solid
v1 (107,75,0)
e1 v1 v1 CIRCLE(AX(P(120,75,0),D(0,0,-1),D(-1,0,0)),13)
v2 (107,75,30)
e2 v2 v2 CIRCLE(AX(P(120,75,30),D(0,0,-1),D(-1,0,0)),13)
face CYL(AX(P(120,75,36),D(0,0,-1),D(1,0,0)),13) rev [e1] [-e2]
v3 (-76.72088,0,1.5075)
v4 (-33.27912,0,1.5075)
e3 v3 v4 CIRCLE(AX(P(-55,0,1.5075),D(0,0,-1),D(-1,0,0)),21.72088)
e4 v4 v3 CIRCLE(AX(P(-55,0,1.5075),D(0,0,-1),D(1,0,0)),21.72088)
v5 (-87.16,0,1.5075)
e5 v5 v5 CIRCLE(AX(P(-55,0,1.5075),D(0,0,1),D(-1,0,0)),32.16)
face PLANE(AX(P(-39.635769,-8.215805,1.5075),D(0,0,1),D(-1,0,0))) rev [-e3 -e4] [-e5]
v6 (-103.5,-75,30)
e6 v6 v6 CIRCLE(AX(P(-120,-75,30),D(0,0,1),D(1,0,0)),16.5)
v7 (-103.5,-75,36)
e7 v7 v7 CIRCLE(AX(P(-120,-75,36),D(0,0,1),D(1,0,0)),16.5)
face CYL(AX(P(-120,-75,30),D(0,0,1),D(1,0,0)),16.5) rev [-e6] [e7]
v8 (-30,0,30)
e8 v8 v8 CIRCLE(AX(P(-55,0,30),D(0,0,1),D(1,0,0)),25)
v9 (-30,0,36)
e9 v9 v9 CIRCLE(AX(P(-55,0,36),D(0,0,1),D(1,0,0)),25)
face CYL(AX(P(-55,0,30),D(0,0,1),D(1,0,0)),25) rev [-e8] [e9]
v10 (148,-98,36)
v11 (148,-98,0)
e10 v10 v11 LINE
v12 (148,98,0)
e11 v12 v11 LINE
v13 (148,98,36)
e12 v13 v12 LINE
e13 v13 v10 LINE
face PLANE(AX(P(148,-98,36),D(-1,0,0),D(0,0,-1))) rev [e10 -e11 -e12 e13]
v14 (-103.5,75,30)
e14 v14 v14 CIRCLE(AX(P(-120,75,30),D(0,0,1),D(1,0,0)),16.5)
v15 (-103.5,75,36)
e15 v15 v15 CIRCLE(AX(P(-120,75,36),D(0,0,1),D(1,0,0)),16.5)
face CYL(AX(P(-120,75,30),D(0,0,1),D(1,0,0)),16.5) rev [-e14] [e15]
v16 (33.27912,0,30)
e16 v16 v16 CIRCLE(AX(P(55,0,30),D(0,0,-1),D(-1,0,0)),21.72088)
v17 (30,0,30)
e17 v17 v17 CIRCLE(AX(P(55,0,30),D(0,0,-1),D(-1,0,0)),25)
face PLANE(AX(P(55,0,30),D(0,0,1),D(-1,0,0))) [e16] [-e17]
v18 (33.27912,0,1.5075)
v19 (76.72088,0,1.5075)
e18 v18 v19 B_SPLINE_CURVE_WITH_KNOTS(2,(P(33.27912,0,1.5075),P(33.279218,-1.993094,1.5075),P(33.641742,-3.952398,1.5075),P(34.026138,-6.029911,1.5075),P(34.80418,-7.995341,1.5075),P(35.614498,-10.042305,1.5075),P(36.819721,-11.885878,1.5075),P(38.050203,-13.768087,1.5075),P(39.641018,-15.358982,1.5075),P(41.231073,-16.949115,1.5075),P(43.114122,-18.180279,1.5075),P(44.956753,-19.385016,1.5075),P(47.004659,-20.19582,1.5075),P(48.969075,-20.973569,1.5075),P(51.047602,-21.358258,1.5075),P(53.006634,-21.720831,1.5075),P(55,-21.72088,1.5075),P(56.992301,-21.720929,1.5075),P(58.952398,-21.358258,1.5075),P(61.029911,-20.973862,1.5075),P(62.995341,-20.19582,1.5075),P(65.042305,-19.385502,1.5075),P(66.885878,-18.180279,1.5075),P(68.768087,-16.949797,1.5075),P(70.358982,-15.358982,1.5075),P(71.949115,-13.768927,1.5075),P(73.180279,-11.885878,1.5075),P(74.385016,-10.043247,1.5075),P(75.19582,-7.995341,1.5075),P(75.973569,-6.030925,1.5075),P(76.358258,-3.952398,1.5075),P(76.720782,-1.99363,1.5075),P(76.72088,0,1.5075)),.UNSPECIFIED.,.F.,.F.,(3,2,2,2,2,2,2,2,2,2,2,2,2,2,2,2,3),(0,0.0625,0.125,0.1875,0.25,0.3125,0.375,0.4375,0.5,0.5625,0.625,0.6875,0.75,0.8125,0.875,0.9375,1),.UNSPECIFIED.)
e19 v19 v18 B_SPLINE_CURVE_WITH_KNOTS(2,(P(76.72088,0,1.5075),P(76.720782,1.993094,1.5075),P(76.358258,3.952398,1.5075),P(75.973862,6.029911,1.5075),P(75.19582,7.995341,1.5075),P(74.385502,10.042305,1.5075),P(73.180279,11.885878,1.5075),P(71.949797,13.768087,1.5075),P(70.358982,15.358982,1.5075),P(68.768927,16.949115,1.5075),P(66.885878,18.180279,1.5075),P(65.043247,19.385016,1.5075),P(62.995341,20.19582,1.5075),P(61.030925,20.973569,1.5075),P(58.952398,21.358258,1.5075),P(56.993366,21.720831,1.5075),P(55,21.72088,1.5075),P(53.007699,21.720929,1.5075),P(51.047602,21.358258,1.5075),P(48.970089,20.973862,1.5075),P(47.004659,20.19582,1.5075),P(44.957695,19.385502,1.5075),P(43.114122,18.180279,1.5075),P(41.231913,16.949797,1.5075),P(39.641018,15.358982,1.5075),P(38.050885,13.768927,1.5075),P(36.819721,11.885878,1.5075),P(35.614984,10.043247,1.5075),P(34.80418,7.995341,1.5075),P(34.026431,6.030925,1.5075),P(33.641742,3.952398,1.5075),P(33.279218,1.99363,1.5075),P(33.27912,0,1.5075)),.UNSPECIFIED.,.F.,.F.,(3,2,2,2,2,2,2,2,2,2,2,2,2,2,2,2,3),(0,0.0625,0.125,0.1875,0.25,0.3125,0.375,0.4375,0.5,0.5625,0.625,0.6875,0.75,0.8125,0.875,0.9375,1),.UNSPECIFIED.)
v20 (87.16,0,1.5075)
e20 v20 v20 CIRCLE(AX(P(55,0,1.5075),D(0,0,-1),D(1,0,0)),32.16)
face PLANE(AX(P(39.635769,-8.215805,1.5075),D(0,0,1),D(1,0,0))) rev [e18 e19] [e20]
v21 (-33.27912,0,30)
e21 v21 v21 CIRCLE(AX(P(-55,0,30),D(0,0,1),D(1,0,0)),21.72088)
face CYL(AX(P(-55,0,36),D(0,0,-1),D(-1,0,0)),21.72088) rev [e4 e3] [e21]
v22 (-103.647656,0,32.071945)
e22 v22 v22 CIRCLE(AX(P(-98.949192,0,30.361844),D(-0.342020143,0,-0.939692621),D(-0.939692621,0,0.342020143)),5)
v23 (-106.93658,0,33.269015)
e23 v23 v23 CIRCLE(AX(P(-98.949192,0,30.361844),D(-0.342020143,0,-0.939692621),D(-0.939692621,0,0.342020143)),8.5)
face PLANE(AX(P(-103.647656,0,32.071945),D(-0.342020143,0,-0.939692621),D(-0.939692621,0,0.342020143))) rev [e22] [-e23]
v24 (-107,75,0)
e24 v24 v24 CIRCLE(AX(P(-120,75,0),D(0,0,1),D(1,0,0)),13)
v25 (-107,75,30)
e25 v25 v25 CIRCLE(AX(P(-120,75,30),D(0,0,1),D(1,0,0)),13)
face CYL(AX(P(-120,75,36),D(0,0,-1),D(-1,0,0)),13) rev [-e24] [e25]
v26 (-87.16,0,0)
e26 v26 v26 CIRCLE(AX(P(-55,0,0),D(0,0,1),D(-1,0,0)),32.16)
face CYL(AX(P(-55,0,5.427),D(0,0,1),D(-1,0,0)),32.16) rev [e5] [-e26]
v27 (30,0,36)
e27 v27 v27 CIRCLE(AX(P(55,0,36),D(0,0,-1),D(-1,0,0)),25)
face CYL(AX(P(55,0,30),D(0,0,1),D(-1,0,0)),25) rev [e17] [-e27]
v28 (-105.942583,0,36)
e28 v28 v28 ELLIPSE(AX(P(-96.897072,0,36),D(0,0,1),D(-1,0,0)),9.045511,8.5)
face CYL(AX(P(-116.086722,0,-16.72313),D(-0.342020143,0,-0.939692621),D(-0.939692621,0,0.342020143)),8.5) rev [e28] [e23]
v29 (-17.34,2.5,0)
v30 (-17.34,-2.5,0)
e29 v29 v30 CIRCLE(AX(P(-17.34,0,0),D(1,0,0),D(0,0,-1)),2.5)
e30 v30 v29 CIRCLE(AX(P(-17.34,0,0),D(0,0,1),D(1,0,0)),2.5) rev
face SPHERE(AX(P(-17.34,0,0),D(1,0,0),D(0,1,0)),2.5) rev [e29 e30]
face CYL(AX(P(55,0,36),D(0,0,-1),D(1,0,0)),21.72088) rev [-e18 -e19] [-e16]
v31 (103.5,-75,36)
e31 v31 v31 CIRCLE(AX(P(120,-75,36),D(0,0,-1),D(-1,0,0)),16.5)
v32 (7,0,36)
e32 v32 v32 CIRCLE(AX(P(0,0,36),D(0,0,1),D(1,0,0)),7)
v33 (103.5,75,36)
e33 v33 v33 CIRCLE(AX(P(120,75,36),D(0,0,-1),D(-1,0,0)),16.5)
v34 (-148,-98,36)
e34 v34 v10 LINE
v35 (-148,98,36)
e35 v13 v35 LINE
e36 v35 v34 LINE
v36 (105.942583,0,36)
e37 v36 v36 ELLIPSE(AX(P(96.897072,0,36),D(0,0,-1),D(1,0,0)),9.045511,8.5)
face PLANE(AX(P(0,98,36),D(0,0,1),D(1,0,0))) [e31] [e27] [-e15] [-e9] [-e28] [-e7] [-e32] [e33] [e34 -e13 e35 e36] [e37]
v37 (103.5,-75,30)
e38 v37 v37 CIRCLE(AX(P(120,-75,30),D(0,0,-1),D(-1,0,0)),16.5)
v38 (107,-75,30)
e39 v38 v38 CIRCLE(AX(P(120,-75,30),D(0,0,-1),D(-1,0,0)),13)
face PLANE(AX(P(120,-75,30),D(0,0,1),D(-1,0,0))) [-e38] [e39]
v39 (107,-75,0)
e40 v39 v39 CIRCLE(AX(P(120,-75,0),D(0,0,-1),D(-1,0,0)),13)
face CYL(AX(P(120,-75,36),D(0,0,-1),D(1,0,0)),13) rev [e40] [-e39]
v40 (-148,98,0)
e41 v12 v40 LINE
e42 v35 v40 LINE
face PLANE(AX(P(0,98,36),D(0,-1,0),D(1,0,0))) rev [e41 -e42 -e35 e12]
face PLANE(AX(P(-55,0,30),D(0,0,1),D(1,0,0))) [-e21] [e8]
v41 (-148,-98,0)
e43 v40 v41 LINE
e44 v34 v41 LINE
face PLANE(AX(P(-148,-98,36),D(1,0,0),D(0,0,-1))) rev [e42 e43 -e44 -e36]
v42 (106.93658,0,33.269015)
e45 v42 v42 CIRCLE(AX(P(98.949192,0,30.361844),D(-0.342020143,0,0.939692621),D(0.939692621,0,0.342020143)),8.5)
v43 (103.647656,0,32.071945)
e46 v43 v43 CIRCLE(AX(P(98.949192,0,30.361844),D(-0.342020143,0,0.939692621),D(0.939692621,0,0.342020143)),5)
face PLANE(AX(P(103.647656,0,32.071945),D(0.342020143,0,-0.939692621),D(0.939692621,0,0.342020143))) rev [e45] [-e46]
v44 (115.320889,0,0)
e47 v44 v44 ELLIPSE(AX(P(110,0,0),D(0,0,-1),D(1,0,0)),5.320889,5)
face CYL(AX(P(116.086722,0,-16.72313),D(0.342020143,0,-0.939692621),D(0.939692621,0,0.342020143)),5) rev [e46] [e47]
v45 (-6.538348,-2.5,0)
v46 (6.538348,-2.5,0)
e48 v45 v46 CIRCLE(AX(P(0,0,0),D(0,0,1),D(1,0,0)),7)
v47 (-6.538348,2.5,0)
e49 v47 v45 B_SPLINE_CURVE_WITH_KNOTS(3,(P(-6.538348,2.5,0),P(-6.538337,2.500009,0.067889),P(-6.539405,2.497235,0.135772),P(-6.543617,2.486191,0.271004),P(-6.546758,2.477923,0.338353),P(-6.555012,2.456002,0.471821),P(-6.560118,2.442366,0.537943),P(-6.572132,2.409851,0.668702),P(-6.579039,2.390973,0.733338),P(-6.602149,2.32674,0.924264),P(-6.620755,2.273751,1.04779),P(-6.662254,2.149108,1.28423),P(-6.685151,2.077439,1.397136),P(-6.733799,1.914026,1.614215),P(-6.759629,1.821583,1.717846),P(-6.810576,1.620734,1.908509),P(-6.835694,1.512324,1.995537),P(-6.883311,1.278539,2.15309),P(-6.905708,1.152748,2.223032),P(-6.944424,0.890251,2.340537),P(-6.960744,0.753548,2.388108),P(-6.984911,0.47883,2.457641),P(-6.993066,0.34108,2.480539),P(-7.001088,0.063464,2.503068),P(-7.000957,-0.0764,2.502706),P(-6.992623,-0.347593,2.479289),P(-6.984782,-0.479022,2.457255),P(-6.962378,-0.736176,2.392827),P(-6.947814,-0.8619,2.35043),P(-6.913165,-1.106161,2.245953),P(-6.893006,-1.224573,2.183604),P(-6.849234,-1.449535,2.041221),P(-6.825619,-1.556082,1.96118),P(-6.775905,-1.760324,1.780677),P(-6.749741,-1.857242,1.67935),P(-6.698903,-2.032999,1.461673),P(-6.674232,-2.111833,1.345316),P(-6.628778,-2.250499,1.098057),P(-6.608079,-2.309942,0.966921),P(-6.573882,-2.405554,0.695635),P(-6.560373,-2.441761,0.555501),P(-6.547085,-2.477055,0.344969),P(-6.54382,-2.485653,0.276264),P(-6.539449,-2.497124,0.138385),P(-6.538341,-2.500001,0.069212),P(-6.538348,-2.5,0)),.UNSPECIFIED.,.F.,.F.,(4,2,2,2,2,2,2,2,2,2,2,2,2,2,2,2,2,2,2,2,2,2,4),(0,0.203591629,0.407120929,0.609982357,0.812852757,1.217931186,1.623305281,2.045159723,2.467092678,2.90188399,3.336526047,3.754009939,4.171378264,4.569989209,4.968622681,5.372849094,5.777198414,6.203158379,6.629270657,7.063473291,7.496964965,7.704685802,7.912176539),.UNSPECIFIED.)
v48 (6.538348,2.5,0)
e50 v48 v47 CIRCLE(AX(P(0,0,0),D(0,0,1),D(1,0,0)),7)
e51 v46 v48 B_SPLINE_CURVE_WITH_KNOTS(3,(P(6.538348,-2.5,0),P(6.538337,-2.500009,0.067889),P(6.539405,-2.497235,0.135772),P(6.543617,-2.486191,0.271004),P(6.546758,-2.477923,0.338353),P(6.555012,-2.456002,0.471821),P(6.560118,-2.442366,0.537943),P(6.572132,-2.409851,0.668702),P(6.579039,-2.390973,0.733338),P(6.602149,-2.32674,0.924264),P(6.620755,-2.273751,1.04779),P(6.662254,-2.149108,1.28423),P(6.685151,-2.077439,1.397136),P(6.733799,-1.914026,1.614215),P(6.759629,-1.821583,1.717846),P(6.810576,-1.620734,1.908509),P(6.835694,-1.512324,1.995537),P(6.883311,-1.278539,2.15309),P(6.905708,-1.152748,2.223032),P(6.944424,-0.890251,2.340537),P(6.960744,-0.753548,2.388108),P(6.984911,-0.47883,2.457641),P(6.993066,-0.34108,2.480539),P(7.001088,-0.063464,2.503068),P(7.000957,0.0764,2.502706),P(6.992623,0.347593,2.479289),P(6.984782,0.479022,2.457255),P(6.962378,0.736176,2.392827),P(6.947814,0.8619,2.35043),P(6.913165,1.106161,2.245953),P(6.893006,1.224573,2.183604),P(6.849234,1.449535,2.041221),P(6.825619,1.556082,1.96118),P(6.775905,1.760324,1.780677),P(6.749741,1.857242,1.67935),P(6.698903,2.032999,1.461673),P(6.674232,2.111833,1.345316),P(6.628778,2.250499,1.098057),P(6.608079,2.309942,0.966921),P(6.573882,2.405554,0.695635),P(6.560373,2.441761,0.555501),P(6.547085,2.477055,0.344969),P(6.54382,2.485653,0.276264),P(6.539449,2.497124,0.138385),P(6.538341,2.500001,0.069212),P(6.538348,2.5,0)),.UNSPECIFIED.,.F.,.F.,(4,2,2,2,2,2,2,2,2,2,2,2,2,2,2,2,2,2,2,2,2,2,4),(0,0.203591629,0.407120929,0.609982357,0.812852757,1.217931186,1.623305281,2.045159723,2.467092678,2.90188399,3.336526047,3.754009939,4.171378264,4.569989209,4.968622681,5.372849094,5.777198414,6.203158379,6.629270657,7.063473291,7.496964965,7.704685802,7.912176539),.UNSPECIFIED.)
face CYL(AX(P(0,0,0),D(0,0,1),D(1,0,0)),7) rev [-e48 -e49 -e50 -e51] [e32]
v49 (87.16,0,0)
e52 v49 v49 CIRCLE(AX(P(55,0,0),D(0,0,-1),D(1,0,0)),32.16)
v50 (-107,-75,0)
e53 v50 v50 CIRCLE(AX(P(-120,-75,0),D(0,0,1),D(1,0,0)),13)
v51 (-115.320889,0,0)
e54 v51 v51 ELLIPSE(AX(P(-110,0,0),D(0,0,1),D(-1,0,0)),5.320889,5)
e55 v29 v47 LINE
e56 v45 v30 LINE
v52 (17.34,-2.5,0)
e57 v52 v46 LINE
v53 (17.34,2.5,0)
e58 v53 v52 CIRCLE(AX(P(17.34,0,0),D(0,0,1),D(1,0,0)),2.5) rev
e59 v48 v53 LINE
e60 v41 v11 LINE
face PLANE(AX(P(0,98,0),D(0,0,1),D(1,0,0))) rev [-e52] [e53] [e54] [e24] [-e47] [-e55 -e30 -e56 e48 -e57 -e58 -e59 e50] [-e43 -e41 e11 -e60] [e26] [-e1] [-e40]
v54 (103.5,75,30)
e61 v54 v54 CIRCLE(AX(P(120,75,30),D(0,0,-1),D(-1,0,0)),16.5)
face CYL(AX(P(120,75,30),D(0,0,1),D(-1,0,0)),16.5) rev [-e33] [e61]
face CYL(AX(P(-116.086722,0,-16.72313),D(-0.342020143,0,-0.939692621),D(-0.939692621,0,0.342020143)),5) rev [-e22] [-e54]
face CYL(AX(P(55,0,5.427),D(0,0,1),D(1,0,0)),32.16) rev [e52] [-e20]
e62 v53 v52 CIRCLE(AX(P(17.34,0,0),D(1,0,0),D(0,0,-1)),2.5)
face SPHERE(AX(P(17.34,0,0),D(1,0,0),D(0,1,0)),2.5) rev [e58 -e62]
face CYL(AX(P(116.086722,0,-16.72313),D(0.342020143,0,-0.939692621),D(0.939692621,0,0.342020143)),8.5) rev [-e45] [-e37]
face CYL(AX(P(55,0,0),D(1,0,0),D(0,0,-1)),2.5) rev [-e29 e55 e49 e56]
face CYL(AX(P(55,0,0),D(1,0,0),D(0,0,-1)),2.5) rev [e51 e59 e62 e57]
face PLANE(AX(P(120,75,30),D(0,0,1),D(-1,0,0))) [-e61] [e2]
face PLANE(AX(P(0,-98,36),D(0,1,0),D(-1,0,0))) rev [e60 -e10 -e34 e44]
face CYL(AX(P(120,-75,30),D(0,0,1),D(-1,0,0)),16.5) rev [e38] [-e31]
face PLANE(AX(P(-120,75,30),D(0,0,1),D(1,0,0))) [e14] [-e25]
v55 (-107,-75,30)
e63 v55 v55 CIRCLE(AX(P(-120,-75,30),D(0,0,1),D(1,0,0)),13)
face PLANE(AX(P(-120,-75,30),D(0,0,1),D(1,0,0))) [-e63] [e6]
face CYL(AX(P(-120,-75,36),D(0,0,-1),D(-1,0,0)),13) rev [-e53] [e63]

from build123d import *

# Parameters (mm, degrees)
SKETCH1_W      = 148
SKETCH1_H      = 196
SKETCH1_R      = 13
EXTRUDE1_DEPTH = 36
SKETCH2_R      = 21.720880237
EXTRUDE2_DEPTH = 182.118745579
SKETCH3_R      = 16.5
EXTRUDE3_DEPTH = 6
SKETCH5_R      = 25
EXTRUDE5_DEPTH = 6
SKETCH4_R      = 7
EXTRUDE4_DEPTH = 182.118745579


# Read off the part's stored shape, not the designer's step: Cavity1
with BuildPart() as part:
    # Sketch1 → Extrude1 (new body)
    with BuildSketch(Plane.XY):
        with Locations((-74, 0)):
            Rectangle(SKETCH1_W, SKETCH1_H)
        with Locations((-120, 75)):
            Circle(SKETCH1_R, mode=Mode.SUBTRACT)
        with Locations((-120, -75)):
            Circle(SKETCH1_R, mode=Mode.SUBTRACT)
    extrude(amount=EXTRUDE1_DEPTH)

    # Cavity1 outline → Cavity1 (revolve, cut)
    with BuildSketch(Plane(origin=(-55, 0, 0), x_dir=(1, 0, 0), z_dir=(0, -1, 0))):
        with BuildLine():
            Line((32.16, 1.5075), (21.720880237, 1.5075))
            ThreePointArc((21.720880237, 1.5075), (19.980169175, 1.111079032), (18.582768743, 0))
            Line((18.582768743, 0), (32.16, 0))
            Line((32.16, 0), (32.16, 1.5075))
        make_face()
    revolve(axis=Axis((-55, 0, 0), (0, 0, 1)), mode=Mode.SUBTRACT)

    # Sketch2 → Extrude2 (cut, through all)
    with BuildSketch(Plane.XY):
        with Locations((-55, 0)):
            Circle(SKETCH2_R)
    extrude(amount=EXTRUDE2_DEPTH, mode=Mode.SUBTRACT)

    # Sketch3 → Extrude3 (cut)
    with BuildSketch(Plane.XY.offset(36)):
        with Locations((-120, 75)):
            Circle(SKETCH3_R)
        with Locations((-120, -75)):
            Circle(SKETCH3_R)
    extrude(amount=-EXTRUDE3_DEPTH, mode=Mode.SUBTRACT)

    # Sketch5 → Extrude5 (cut)
    with BuildSketch(Plane.XY.offset(36)):
        with Locations((-55, 0)):
            Circle(SKETCH5_R)
    extrude(amount=-EXTRUDE5_DEPTH, mode=Mode.SUBTRACT)

    # Sketch7 → Cut-Revolve2 (revolve, cut)
    with BuildSketch(Plane(origin=(0, 0, 0), x_dir=(1, 0, 0), z_dir=(0, 1, 0))):
        Polygon((-116.584356678, 3.471349293), (-103.64765553, -32.071944992), (-106.936579703, -33.269015494), (-102.122979844, -46.494272413), (-94.135592567, -43.587101195), (-111.885893574, 5.18145001), align=None)
    revolve(axis=Axis((-116.086721699, 0, -16.723130427), (0.34202014332566283, 0, 0.9396926207859105)), mode=Mode.SUBTRACT)

    # Mirror1: part across plane


with BuildPart() as part_1:
    add(part.part)
    add(part.part.mirror(Plane(origin=(0, 0, 0), x_dir=(0, 0, 1), z_dir=(1, 0, 0))))

    # Sketch4 → Extrude4 (cut, through all)
    with BuildSketch(Plane.XY.offset(36)):
        Circle(SKETCH4_R)
    extrude(amount=-EXTRUDE4_DEPTH, mode=Mode.SUBTRACT)

    # Sketch6 → Cut-Revolve1 (revolve, cut)
    with BuildSketch(Plane(origin=(0, 0, 0), x_dir=(-1, 0, 0), z_dir=(0, 0, -1))):
        with BuildLine():
            Line((-17.34, 2.5), (17.34, 2.5))
            ThreePointArc((17.34, 2.5), (19.107766953, 1.767766953), (19.84, 0))
            Line((19.84, 0), (-19.84, 0))
            ThreePointArc((-19.84, 0), (-19.107766953, 1.767766953), (-17.34, 2.5))
        make_face()
    revolve(axis=Axis((55, 0, 0), (-1, 0, 0)), mode=Mode.SUBTRACT)


solid = part_1.part
